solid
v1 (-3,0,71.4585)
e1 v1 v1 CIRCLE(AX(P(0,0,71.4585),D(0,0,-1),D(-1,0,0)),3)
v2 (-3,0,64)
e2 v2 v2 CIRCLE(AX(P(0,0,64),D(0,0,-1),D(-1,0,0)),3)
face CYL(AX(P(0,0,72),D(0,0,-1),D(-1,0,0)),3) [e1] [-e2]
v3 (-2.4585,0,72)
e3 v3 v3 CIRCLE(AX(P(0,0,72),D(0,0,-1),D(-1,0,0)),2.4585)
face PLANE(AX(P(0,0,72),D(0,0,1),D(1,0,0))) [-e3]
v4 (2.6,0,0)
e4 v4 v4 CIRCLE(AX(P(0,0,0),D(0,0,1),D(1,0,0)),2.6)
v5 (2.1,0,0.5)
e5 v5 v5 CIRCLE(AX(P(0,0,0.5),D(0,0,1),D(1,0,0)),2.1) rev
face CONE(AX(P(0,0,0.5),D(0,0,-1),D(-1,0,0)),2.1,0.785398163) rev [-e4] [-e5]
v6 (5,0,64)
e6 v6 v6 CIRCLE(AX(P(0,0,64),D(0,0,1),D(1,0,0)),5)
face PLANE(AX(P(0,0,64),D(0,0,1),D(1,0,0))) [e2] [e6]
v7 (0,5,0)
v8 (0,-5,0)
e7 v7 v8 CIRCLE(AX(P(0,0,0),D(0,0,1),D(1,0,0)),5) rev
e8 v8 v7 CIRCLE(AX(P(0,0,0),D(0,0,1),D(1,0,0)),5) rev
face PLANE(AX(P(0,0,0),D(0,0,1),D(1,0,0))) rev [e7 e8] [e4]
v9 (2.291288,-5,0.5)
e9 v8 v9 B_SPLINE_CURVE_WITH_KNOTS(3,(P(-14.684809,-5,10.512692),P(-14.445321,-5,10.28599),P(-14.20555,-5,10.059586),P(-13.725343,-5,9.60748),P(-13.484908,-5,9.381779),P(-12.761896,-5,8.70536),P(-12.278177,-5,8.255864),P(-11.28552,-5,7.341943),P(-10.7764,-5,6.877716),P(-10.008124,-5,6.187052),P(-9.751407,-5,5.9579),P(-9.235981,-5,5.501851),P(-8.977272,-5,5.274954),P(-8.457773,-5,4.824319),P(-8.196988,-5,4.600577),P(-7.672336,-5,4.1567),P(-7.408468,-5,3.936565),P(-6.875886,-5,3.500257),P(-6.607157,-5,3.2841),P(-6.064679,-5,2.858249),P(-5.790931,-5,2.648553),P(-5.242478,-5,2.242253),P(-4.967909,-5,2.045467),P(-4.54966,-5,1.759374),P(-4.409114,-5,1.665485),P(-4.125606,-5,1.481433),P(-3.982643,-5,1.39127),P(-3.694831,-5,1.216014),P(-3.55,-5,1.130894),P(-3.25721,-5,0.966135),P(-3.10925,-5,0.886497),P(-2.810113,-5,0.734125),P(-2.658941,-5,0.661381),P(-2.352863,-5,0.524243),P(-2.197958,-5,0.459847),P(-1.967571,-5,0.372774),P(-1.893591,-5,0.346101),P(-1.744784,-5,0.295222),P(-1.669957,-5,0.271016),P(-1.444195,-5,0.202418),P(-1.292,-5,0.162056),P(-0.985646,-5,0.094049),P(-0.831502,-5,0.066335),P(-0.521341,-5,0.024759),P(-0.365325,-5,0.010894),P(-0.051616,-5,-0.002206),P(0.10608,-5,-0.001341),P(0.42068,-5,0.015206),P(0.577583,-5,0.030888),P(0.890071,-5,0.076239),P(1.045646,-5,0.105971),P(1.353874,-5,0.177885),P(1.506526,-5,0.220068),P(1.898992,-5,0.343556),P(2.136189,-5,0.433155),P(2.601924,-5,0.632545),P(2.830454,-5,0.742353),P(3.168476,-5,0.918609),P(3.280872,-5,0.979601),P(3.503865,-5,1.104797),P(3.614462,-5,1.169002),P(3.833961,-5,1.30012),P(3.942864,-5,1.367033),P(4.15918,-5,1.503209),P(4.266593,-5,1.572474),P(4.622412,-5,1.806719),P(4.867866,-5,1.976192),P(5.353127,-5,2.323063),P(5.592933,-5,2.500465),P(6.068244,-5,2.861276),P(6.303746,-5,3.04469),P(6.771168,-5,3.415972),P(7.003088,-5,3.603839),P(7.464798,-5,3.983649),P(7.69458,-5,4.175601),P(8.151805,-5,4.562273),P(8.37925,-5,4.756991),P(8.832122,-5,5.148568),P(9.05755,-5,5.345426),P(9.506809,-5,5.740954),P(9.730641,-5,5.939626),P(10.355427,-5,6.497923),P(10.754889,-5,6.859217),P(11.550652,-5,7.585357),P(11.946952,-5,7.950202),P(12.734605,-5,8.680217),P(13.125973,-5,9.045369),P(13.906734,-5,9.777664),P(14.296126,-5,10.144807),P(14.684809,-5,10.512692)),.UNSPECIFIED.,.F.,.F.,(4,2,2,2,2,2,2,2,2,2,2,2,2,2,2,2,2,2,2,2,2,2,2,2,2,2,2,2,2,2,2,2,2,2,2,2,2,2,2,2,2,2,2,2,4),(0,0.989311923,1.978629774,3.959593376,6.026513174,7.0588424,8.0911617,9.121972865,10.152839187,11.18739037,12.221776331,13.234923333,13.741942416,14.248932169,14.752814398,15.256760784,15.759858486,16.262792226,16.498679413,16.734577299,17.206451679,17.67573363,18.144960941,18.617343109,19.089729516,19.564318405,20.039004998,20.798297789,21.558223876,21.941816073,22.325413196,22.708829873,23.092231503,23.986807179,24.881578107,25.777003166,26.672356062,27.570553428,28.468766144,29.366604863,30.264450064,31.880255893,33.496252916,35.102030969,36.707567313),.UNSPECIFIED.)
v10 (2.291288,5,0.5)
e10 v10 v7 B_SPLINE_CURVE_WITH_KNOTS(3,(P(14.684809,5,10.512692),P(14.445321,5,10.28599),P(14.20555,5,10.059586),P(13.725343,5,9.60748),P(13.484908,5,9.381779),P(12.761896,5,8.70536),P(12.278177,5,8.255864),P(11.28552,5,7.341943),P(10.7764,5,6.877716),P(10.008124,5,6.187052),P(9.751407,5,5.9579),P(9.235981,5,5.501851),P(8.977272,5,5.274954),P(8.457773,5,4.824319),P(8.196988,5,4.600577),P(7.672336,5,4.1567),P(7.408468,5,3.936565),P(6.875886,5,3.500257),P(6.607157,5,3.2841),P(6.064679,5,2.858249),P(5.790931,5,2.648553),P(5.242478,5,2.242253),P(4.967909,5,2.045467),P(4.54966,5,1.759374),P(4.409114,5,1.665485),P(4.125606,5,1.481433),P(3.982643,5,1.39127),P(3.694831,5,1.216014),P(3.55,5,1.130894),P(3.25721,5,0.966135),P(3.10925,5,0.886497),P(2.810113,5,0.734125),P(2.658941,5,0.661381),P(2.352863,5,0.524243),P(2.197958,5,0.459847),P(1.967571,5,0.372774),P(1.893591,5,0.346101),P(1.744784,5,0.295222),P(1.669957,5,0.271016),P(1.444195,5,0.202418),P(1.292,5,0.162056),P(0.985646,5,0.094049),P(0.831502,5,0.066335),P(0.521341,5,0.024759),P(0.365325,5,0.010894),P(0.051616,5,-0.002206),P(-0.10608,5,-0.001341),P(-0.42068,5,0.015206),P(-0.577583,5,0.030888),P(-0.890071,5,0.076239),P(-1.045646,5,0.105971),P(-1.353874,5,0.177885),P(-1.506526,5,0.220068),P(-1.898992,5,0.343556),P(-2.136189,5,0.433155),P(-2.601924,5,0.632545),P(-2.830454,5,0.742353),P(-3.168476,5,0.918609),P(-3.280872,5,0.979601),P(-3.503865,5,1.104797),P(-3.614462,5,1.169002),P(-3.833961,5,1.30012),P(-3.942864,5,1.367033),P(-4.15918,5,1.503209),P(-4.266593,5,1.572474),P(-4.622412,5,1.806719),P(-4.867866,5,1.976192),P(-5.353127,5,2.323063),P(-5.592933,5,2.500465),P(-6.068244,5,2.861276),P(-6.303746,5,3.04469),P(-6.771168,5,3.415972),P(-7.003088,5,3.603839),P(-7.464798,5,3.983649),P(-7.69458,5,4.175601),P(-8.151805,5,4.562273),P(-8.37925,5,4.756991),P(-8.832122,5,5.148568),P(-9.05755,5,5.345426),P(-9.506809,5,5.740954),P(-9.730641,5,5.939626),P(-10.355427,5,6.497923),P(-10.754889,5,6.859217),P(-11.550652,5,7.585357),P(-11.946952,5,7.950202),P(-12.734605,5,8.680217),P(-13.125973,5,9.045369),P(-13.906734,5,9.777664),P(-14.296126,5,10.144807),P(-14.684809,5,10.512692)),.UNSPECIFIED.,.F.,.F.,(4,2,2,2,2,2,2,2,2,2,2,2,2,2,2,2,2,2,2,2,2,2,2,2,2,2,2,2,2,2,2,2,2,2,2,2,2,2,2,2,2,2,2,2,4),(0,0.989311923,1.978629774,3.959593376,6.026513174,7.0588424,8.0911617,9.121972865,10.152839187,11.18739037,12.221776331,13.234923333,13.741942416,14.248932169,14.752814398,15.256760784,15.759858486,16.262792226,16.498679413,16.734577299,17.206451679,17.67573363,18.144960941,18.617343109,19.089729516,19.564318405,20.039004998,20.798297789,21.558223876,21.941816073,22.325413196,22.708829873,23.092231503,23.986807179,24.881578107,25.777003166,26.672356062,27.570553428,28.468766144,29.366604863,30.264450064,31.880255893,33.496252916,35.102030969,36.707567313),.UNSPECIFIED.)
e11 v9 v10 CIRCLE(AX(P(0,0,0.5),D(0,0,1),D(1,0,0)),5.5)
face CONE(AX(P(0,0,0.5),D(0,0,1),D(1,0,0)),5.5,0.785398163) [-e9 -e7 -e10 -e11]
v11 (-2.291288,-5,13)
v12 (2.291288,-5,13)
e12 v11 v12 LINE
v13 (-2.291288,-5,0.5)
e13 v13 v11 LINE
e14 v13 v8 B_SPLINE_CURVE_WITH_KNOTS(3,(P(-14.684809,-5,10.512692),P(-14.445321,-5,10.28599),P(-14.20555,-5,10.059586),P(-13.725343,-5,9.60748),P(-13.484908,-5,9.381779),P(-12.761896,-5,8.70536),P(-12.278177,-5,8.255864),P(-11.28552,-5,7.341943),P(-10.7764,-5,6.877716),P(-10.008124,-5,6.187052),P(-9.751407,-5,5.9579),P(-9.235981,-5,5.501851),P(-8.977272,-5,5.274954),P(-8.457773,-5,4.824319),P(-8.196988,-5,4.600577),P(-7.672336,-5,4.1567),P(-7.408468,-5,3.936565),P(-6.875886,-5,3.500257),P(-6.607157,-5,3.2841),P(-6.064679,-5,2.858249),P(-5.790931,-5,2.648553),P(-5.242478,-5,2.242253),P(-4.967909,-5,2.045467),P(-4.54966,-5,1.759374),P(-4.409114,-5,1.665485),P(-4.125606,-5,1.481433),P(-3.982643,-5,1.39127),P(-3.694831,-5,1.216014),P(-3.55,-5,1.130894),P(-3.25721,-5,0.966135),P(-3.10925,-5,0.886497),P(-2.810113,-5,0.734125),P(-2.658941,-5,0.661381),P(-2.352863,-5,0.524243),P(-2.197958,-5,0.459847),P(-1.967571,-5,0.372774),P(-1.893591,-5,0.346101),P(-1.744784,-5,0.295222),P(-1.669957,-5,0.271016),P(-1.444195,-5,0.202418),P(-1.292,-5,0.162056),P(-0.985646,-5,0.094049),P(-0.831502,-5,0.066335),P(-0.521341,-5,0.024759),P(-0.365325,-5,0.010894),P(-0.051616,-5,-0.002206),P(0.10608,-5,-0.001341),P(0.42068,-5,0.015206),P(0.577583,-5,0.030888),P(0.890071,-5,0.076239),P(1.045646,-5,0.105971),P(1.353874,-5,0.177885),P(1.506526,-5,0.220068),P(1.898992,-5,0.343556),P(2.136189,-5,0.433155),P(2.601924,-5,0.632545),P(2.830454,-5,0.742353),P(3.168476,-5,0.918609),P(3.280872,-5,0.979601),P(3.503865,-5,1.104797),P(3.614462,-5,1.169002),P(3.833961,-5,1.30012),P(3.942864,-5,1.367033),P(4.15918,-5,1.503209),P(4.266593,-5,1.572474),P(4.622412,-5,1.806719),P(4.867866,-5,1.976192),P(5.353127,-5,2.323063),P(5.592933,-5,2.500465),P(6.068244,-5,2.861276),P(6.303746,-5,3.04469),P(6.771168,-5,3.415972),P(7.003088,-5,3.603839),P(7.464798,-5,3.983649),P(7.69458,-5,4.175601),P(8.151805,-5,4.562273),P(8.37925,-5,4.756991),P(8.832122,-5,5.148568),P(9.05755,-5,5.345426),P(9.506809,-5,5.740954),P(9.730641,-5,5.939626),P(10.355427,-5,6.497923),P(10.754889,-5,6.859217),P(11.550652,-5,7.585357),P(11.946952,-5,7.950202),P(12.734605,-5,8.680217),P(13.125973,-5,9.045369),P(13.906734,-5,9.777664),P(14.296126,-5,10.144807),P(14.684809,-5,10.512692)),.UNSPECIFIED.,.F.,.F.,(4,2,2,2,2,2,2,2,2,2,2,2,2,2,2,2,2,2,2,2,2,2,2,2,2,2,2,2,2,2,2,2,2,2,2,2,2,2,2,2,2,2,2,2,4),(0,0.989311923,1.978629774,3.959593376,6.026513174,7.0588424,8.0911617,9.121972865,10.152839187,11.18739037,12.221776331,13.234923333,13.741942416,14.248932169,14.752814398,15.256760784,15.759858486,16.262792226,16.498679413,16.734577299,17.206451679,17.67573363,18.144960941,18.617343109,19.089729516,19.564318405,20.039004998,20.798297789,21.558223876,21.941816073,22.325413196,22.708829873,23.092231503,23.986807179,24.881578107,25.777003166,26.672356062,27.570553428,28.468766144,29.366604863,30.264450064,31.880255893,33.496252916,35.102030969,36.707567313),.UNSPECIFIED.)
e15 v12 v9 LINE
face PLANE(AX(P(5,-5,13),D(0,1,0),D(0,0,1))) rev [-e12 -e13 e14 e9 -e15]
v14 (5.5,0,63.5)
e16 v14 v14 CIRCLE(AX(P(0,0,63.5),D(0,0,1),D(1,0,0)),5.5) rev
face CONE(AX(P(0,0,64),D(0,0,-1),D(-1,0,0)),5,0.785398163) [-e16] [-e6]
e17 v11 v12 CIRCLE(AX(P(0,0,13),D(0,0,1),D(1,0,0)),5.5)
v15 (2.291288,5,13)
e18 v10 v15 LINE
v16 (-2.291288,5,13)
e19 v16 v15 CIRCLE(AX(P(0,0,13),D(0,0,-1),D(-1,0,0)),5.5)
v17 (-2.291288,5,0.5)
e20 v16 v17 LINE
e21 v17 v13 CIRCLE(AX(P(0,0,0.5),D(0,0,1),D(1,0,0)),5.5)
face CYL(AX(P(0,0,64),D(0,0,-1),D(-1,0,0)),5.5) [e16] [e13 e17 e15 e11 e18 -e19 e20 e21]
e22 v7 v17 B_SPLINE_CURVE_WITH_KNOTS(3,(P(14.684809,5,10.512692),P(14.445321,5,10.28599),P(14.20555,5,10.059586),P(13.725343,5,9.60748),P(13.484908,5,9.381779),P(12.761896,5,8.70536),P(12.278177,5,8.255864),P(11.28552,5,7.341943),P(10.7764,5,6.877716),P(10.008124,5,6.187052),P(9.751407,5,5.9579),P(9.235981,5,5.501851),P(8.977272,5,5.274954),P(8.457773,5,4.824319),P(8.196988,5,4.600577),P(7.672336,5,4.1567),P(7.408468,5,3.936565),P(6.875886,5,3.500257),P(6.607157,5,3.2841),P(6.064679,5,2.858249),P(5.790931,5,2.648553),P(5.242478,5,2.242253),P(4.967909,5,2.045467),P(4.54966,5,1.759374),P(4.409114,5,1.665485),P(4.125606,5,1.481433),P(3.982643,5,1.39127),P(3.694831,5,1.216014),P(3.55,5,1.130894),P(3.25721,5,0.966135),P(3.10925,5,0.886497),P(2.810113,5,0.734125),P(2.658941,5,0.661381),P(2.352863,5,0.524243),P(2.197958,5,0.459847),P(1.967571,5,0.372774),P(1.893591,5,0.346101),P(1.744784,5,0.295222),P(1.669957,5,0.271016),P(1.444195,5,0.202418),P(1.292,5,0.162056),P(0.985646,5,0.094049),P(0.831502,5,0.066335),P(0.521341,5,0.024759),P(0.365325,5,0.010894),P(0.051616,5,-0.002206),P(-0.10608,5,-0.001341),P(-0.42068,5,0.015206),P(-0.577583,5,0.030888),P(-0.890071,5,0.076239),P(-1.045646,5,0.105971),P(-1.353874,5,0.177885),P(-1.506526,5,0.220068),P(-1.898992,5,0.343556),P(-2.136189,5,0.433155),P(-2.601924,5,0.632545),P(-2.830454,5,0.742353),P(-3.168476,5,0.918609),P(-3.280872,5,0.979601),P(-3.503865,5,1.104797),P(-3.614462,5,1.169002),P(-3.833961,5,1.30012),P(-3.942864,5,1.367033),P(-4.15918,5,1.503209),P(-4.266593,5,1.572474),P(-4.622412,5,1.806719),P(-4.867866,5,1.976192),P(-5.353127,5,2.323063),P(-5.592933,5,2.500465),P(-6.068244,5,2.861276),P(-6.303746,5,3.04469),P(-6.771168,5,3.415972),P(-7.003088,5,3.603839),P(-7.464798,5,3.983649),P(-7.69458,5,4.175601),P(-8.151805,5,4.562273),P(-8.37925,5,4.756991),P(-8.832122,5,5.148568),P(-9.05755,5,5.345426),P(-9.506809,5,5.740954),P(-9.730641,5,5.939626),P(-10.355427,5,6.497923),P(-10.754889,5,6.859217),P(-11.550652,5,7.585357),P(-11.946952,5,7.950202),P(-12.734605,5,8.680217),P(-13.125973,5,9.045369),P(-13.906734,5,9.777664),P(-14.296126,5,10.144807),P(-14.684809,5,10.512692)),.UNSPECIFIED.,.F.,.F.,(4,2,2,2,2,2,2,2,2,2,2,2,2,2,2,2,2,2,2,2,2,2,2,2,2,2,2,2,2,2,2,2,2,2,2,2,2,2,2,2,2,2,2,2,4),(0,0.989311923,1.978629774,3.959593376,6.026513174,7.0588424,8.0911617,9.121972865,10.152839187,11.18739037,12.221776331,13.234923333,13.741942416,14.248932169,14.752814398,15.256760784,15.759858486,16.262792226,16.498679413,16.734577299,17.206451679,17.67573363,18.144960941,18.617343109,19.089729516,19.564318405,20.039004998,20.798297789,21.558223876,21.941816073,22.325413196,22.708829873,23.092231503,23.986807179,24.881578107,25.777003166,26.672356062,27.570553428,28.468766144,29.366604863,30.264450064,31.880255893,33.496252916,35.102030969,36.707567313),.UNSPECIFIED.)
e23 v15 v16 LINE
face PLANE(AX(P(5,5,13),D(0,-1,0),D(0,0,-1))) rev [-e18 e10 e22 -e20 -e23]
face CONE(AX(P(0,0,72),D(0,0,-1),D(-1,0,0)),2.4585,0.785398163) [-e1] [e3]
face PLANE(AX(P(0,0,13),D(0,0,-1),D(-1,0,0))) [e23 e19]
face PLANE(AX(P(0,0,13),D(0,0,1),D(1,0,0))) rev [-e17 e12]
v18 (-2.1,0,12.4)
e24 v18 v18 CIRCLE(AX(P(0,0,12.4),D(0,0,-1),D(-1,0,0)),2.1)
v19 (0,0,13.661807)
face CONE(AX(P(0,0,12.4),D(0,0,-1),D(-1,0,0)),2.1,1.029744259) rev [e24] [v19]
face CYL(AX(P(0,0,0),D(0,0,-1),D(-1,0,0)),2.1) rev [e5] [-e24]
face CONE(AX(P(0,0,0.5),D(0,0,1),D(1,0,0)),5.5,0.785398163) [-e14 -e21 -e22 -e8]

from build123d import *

# Parameters (mm, degrees)
SKETCH_1_R             = 5.5
EXTRUDE_1_DEPTH        = 64
CHAMFER_1_SIZE         = 0.5
SKETCH_2_R             = 3.3
EXTRUDE_2_DEPTH        = 8
HOLE_WIZARD_M5_1_D     = 4.2
HOLE_WIZARD_M5_1_DEPTH = 12.4
HOLE_WIZARD_M5_1_TIP   = 1.2618073
CHAMFER_3_SIZE         = 0.5
SKETCH_6_W             = 10
SKETCH_6_H             = 3
CUT_EXTRUDE_1_DEPTH    = 13


# Read off the part's stored shape, not the designer's step: M6 机械螺纹 螺柱1
with BuildPart() as part:
    # 草图1 → 拉伸1 (new body)
    with BuildSketch(Plane.XY):
        Circle(SKETCH_1_R)
    extrude(amount=EXTRUDE_1_DEPTH)

    # 倒角1
    chamfer_1_edges = [part.edges().sort_by_distance(p)[0] for p in [
        (-5.5, 0, 0),
        (-5.5, 0, 64),
    ]]
    chamfer(chamfer_1_edges, length=CHAMFER_1_SIZE)

    # 草图2 → 拉伸2 (add)
    with BuildSketch(Plane.XY.offset(64)):
        Circle(SKETCH_2_R)
    extrude(amount=EXTRUDE_2_DEPTH)

    # M5 螺纹孔1
    with Locations(Plane(origin=(0, 0, 0), x_dir=(-1, 0, 0), z_dir=(0, 0, -1))):
        with Locations((0, 0)):
            Hole(HOLE_WIZARD_M5_1_D / 2, depth=HOLE_WIZARD_M5_1_DEPTH)
            with Locations((0, 0, -(HOLE_WIZARD_M5_1_DEPTH + HOLE_WIZARD_M5_1_TIP / 2))):  # 118° drill point
                Cone(0, HOLE_WIZARD_M5_1_D / 2, HOLE_WIZARD_M5_1_TIP, mode=Mode.SUBTRACT)

    # 倒角3
    chamfer_3_edges = [part.edges().sort_by_distance(p)[0] for p in [
        (-2.1, 0, 0),
    ]]
    chamfer(chamfer_3_edges, length=CHAMFER_3_SIZE)

    # 草图6 → 切除-拉伸1 (cut)
    with BuildSketch(Plane(origin=(0, 0, 0), x_dir=(-1, 0, 0), z_dir=(0, 0, -1))):
        with Locations((0, 6.5)):
            Rectangle(SKETCH_6_W, SKETCH_6_H)
        with Locations((0, -6.5)):
            Rectangle(SKETCH_6_W, SKETCH_6_H)
    extrude(amount=-CUT_EXTRUDE_1_DEPTH, mode=Mode.SUBTRACT)

    # M6 机械螺纹 螺柱1 outline → M6 机械螺纹 螺柱1 (revolve, cut)
    with BuildSketch(Plane.XZ):
        Polygon((3.3, 72), (2.4585, 72), (3, 71.4585), (3, 64), (3.3, 64), align=None)
    revolve(axis=Axis((0, 0, 0), (0, 0, 1)), mode=Mode.SUBTRACT)


solid = part.part
